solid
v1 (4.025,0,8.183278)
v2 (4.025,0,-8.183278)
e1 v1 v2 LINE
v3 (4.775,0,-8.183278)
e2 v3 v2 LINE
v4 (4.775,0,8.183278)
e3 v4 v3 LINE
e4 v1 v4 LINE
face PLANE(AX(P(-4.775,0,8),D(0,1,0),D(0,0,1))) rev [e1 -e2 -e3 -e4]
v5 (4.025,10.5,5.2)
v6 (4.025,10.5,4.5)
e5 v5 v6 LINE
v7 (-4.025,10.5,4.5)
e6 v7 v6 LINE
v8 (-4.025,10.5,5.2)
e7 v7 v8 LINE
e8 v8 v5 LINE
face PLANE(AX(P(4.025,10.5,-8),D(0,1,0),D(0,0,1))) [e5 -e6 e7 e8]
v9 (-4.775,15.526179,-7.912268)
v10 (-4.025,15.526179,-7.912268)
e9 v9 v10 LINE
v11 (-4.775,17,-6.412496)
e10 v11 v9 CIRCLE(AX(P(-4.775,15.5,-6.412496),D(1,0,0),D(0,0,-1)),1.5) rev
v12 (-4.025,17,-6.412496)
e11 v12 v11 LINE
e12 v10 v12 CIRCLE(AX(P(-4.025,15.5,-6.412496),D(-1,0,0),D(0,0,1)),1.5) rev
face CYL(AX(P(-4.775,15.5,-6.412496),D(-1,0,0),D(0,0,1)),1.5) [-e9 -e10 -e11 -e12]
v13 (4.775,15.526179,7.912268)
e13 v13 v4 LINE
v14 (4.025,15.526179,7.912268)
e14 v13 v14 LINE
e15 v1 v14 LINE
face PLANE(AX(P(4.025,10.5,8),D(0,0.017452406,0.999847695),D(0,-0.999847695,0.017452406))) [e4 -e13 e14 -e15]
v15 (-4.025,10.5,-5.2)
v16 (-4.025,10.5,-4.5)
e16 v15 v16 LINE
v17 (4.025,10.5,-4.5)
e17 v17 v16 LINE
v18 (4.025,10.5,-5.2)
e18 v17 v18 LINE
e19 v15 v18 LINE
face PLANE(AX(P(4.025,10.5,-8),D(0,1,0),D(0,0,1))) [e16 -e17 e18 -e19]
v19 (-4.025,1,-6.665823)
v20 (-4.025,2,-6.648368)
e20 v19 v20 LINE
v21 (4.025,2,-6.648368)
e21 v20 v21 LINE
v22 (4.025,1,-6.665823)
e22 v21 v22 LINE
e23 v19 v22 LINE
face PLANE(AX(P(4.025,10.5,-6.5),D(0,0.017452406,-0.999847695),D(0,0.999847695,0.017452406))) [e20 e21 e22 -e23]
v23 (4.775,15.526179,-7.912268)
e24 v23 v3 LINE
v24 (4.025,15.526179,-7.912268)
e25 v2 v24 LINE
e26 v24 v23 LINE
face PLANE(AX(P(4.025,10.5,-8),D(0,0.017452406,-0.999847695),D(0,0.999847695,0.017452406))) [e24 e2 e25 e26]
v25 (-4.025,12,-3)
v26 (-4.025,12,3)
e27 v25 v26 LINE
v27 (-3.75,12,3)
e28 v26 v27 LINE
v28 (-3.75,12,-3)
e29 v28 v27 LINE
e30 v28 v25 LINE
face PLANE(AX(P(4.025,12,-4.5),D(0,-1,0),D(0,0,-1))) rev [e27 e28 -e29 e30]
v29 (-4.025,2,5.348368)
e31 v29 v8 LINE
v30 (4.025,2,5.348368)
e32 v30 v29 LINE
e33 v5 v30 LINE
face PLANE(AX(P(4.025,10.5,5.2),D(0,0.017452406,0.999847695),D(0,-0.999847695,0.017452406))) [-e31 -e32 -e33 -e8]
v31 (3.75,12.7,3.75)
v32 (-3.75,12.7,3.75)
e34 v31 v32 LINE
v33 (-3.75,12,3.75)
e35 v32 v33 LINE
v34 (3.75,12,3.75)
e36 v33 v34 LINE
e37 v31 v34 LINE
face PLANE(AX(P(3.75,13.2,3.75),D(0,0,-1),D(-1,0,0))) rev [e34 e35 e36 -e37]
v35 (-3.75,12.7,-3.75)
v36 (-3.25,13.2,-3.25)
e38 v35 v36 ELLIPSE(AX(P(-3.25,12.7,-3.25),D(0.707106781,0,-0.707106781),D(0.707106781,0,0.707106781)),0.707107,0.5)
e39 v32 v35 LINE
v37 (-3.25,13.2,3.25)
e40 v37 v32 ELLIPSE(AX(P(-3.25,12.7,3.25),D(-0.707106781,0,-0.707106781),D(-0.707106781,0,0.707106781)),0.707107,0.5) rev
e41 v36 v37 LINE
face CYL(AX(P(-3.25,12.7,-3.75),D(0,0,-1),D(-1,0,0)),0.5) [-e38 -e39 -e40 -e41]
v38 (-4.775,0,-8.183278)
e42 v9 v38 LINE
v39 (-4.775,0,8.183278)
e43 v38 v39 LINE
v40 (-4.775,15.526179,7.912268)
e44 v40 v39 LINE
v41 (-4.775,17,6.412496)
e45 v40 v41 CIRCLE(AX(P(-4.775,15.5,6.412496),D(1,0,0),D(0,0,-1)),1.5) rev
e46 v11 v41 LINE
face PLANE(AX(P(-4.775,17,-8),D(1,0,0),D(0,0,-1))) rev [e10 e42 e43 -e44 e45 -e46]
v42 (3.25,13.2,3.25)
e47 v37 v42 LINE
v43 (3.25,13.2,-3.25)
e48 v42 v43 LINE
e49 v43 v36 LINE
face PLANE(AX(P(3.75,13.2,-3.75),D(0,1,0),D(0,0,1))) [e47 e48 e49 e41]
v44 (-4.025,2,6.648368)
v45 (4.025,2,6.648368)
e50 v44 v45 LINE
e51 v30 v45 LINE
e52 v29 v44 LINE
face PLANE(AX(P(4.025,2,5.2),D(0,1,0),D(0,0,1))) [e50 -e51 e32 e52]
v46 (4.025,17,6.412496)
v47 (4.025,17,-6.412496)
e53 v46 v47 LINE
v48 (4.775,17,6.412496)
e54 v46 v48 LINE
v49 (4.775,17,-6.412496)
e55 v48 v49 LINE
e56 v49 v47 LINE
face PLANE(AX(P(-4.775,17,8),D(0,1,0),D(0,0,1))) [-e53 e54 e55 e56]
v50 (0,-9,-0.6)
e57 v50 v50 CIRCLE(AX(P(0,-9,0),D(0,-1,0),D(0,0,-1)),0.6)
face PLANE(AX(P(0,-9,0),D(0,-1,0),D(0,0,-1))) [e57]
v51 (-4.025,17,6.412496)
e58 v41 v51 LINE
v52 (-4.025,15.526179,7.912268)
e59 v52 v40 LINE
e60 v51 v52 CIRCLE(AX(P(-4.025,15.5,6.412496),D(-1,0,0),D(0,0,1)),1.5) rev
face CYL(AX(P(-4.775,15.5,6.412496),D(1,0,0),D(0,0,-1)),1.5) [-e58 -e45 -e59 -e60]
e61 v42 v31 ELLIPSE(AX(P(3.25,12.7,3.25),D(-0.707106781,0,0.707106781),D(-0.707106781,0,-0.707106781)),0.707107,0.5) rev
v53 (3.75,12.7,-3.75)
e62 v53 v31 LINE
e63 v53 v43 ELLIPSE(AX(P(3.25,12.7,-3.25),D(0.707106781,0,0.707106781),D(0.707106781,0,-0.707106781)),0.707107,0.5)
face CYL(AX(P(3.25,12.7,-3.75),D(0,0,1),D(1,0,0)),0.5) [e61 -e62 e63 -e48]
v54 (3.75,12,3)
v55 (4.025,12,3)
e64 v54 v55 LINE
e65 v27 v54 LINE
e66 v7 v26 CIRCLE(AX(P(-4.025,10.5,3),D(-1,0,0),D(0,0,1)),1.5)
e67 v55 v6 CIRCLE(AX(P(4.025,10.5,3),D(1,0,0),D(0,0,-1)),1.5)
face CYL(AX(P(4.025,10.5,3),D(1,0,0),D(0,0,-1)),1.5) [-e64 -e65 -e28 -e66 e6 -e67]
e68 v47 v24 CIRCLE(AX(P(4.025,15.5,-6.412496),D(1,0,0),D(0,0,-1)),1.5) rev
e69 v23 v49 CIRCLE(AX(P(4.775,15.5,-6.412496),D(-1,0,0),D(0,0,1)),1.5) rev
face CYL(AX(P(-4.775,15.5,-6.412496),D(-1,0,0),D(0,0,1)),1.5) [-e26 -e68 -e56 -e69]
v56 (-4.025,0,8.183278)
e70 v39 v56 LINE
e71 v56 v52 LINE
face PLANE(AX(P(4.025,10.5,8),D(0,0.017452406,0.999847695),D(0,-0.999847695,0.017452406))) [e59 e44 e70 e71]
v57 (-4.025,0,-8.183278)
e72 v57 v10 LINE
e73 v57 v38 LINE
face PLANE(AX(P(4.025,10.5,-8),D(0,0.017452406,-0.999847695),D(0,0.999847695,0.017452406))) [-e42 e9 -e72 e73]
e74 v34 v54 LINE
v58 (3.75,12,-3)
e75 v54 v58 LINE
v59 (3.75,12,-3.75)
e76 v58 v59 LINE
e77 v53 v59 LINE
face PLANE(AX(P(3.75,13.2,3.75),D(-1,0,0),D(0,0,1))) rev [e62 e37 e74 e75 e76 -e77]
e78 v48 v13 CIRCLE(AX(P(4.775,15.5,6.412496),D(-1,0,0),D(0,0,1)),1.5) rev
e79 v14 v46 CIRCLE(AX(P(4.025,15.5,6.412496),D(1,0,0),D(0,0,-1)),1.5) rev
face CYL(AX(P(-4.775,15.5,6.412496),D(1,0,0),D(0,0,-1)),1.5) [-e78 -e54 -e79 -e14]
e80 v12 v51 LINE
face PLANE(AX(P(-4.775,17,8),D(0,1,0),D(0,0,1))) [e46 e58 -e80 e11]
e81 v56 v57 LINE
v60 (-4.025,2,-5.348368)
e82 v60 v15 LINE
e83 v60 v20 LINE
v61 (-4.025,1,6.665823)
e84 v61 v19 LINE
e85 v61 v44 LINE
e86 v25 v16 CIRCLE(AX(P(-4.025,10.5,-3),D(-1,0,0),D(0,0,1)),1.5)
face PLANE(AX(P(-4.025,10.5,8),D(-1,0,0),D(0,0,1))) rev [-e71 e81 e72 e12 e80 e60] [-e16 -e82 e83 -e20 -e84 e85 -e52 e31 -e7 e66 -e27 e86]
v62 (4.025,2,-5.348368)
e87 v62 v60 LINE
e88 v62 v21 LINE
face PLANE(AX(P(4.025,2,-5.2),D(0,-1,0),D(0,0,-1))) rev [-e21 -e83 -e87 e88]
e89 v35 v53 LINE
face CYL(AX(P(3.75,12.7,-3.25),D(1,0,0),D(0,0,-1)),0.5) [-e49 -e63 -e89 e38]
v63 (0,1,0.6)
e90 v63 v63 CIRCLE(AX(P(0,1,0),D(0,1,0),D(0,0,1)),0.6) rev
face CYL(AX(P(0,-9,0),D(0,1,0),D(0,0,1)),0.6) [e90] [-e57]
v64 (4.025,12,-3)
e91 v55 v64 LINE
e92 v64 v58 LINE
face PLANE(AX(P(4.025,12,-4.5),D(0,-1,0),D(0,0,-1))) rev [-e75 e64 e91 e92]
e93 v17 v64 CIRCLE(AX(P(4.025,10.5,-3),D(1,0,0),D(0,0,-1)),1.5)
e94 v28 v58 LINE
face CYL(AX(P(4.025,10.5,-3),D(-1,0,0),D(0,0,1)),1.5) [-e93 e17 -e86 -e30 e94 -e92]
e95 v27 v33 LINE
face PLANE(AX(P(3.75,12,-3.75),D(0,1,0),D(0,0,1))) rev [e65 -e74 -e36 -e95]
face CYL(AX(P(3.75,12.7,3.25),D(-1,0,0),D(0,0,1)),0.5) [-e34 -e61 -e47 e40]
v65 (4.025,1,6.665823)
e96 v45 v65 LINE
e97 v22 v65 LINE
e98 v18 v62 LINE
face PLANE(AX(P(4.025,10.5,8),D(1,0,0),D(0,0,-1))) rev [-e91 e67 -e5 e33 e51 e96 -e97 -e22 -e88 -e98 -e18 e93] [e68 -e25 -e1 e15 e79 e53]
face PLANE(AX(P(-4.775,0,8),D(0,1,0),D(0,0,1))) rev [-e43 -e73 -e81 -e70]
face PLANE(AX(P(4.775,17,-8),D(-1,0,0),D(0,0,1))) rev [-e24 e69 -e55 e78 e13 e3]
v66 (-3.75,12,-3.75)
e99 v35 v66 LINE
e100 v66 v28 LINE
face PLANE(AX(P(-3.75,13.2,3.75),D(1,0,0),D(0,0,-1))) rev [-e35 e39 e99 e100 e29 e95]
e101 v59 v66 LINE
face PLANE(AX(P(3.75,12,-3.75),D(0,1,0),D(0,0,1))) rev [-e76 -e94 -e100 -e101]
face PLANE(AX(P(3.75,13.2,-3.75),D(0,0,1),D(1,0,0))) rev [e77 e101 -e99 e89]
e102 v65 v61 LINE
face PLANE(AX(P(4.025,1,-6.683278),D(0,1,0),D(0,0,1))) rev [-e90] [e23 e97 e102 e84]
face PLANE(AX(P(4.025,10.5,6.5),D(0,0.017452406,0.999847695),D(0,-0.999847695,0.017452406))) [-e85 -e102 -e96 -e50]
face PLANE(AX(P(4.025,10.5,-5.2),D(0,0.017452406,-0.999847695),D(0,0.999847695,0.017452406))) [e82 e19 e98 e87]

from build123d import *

# Parameters (mm, degrees)
SKETCH_1_W          = 9.55
SKETCH_1_H          = 16
EXTRUDE_1_DEPTH     = 17
SKETCH_2_W          = 8.05
SKETCH_2_H          = 16
CUT_EXTRUDE_1_DEPTH = 6.5
SKETCH_5_W          = 8.05
SKETCH_5_H          = 8.5
CUT_EXTRUDE_4_DEPTH = 2.8
SKETCH_6_W          = 8.05
SKETCH_6_H          = 2
CUT_EXTRUDE_5_DEPTH = 1.5
DRAFT_1_ANGLE       = 1
SKETCH_7_W          = 8.05
SKETCH_7_H          = 13.366556364
CUT_EXTRUDE_6_DEPTH = 1
FILLET_1_R          = 1.5
SKETCH_8_W          = 8.05
SKETCH_8_H          = 9
EXTRUDE_1747_DEPTH  = 1.5
SKETCH_9_R          = 0.6
EXTRUDE_3_DEPTH     = 10
FILLET_2_R          = 1.5
SKETCH_10_W         = 7.5
SKETCH_10_H         = 7.5
EXTRUDE_4_DEPTH     = 1.2
FILLET_4_R          = 0.5


with BuildPart() as part:
    # 草图1 → 拉伸1 (new body)
    with BuildSketch(Plane(origin=(0, 0, 0), x_dir=(1, 0, 0), z_dir=(0, 1, 0))):
        Rectangle(SKETCH_1_W, SKETCH_1_H)
    extrude(amount=EXTRUDE_1_DEPTH)

    # 草图2 → 切除-拉伸1 (cut)
    with BuildSketch(Plane(origin=(0, 17, 0), x_dir=(-1, 0, 0), z_dir=(0, 1, 0))):
        Rectangle(SKETCH_2_W, SKETCH_2_H)
    extrude(amount=-CUT_EXTRUDE_1_DEPTH, mode=Mode.SUBTRACT)

    # 草图5 → 切除-拉伸4 (cut)
    with BuildSketch(Plane(origin=(0, 0, -8), x_dir=(-1, 0, 0), z_dir=(0, 0, -1))):
        with Locations((0, 6.25)):
            Rectangle(SKETCH_5_W, SKETCH_5_H)
    cut_extrude_4 = extrude(amount=-CUT_EXTRUDE_4_DEPTH, mode=Mode.SUBTRACT)

    # 草图6 → 切除-拉伸5 (cut)
    with BuildSketch(Plane(origin=(0, 0, -8), x_dir=(-1, 0, 0), z_dir=(0, 0, -1))):
        with Locations((0, 1)):
            Rectangle(SKETCH_6_W, SKETCH_6_H)
    cut_extrude_5 = extrude(amount=-CUT_EXTRUDE_5_DEPTH, mode=Mode.SUBTRACT)

    # 镜向3: 切除-拉伸4, 切除-拉伸5 across plane
    add(cut_extrude_4.mirror(Plane.XY), mode=Mode.SUBTRACT)
    add(cut_extrude_5.mirror(Plane.XY), mode=Mode.SUBTRACT)

    # 拔模1
    draft_1_faces = [part.faces().sort_by_distance(p)[0] for p in [
        (4.4, 8.5, 8),
        (-4.4, 8.5, 8),
        (0, 1, 6.5),
        (0, 6.25, 5.2),
        (0, 1, -6.5),
        (-4.4, 8.5, -8),
        (0, 6.25, -5.2),
        (4.4, 8.5, -8),
    ]]
    draft(draft_1_faces, Plane(origin=(4.025, 10.5, -8), x_dir=(0, 0, 1), z_dir=(0, 1, 0)), DRAFT_1_ANGLE)

    # 草图7 → 切除-拉伸6 (cut)
    with BuildSketch(Plane.XZ):
        Rectangle(SKETCH_7_W, SKETCH_7_H)
    extrude(amount=-CUT_EXTRUDE_6_DEPTH, mode=Mode.SUBTRACT)

    # 圆角1
    fillet_1_edges = [part.edges().sort_by_distance(p)[0] for p in [
        (4.4, 17, -7.886542078),
        (4.4, 17, 7.886542078),
        (-4.4, 17, -7.886542078),
        (-4.4, 17, 7.886542078),
    ]]
    fillet(fillet_1_edges, radius=FILLET_1_R)

    # 草图8 → Extrude 1747 (add)
    with BuildSketch(Plane(origin=(0, 10.5, 0), x_dir=(-1, 0, 0), z_dir=(0, 1, 0))):
        Rectangle(SKETCH_8_W, SKETCH_8_H)
    extrude(amount=EXTRUDE_1747_DEPTH)

    # 草图9 → 拉伸3 (add)
    with BuildSketch(Plane.XZ.offset(-1)):
        with Locations(Location((0, 0, 0), (0, 0, 90))):
            Circle(SKETCH_9_R)
    extrude(amount=EXTRUDE_3_DEPTH)

    # 圆角2
    fillet_2_edges = [part.edges().sort_by_distance(p)[0] for p in [
        (0, 12, -4.5),
        (0, 12, 4.5),
    ]]
    fillet(fillet_2_edges, radius=FILLET_2_R - 0.0001)  # a hair under: the kernel refuses the full size

    # 草图10 → 拉伸4 (add)
    with BuildSketch(Plane(origin=(0, 12, 0), x_dir=(-1, 0, 0), z_dir=(0, 1, 0))):
        Rectangle(SKETCH_10_W, SKETCH_10_H)
    extrude(amount=EXTRUDE_4_DEPTH)

    # 圆角4
    fillet_4_edges = [part.edges().sort_by_distance(p)[0] for p in [
        (3.75, 13.2, 0),
        (0, 13.2, -3.75),
        (-3.75, 13.2, 0),
        (0, 13.2, 3.75),
    ]]
    fillet(fillet_4_edges, radius=FILLET_4_R)


solid = part.part
